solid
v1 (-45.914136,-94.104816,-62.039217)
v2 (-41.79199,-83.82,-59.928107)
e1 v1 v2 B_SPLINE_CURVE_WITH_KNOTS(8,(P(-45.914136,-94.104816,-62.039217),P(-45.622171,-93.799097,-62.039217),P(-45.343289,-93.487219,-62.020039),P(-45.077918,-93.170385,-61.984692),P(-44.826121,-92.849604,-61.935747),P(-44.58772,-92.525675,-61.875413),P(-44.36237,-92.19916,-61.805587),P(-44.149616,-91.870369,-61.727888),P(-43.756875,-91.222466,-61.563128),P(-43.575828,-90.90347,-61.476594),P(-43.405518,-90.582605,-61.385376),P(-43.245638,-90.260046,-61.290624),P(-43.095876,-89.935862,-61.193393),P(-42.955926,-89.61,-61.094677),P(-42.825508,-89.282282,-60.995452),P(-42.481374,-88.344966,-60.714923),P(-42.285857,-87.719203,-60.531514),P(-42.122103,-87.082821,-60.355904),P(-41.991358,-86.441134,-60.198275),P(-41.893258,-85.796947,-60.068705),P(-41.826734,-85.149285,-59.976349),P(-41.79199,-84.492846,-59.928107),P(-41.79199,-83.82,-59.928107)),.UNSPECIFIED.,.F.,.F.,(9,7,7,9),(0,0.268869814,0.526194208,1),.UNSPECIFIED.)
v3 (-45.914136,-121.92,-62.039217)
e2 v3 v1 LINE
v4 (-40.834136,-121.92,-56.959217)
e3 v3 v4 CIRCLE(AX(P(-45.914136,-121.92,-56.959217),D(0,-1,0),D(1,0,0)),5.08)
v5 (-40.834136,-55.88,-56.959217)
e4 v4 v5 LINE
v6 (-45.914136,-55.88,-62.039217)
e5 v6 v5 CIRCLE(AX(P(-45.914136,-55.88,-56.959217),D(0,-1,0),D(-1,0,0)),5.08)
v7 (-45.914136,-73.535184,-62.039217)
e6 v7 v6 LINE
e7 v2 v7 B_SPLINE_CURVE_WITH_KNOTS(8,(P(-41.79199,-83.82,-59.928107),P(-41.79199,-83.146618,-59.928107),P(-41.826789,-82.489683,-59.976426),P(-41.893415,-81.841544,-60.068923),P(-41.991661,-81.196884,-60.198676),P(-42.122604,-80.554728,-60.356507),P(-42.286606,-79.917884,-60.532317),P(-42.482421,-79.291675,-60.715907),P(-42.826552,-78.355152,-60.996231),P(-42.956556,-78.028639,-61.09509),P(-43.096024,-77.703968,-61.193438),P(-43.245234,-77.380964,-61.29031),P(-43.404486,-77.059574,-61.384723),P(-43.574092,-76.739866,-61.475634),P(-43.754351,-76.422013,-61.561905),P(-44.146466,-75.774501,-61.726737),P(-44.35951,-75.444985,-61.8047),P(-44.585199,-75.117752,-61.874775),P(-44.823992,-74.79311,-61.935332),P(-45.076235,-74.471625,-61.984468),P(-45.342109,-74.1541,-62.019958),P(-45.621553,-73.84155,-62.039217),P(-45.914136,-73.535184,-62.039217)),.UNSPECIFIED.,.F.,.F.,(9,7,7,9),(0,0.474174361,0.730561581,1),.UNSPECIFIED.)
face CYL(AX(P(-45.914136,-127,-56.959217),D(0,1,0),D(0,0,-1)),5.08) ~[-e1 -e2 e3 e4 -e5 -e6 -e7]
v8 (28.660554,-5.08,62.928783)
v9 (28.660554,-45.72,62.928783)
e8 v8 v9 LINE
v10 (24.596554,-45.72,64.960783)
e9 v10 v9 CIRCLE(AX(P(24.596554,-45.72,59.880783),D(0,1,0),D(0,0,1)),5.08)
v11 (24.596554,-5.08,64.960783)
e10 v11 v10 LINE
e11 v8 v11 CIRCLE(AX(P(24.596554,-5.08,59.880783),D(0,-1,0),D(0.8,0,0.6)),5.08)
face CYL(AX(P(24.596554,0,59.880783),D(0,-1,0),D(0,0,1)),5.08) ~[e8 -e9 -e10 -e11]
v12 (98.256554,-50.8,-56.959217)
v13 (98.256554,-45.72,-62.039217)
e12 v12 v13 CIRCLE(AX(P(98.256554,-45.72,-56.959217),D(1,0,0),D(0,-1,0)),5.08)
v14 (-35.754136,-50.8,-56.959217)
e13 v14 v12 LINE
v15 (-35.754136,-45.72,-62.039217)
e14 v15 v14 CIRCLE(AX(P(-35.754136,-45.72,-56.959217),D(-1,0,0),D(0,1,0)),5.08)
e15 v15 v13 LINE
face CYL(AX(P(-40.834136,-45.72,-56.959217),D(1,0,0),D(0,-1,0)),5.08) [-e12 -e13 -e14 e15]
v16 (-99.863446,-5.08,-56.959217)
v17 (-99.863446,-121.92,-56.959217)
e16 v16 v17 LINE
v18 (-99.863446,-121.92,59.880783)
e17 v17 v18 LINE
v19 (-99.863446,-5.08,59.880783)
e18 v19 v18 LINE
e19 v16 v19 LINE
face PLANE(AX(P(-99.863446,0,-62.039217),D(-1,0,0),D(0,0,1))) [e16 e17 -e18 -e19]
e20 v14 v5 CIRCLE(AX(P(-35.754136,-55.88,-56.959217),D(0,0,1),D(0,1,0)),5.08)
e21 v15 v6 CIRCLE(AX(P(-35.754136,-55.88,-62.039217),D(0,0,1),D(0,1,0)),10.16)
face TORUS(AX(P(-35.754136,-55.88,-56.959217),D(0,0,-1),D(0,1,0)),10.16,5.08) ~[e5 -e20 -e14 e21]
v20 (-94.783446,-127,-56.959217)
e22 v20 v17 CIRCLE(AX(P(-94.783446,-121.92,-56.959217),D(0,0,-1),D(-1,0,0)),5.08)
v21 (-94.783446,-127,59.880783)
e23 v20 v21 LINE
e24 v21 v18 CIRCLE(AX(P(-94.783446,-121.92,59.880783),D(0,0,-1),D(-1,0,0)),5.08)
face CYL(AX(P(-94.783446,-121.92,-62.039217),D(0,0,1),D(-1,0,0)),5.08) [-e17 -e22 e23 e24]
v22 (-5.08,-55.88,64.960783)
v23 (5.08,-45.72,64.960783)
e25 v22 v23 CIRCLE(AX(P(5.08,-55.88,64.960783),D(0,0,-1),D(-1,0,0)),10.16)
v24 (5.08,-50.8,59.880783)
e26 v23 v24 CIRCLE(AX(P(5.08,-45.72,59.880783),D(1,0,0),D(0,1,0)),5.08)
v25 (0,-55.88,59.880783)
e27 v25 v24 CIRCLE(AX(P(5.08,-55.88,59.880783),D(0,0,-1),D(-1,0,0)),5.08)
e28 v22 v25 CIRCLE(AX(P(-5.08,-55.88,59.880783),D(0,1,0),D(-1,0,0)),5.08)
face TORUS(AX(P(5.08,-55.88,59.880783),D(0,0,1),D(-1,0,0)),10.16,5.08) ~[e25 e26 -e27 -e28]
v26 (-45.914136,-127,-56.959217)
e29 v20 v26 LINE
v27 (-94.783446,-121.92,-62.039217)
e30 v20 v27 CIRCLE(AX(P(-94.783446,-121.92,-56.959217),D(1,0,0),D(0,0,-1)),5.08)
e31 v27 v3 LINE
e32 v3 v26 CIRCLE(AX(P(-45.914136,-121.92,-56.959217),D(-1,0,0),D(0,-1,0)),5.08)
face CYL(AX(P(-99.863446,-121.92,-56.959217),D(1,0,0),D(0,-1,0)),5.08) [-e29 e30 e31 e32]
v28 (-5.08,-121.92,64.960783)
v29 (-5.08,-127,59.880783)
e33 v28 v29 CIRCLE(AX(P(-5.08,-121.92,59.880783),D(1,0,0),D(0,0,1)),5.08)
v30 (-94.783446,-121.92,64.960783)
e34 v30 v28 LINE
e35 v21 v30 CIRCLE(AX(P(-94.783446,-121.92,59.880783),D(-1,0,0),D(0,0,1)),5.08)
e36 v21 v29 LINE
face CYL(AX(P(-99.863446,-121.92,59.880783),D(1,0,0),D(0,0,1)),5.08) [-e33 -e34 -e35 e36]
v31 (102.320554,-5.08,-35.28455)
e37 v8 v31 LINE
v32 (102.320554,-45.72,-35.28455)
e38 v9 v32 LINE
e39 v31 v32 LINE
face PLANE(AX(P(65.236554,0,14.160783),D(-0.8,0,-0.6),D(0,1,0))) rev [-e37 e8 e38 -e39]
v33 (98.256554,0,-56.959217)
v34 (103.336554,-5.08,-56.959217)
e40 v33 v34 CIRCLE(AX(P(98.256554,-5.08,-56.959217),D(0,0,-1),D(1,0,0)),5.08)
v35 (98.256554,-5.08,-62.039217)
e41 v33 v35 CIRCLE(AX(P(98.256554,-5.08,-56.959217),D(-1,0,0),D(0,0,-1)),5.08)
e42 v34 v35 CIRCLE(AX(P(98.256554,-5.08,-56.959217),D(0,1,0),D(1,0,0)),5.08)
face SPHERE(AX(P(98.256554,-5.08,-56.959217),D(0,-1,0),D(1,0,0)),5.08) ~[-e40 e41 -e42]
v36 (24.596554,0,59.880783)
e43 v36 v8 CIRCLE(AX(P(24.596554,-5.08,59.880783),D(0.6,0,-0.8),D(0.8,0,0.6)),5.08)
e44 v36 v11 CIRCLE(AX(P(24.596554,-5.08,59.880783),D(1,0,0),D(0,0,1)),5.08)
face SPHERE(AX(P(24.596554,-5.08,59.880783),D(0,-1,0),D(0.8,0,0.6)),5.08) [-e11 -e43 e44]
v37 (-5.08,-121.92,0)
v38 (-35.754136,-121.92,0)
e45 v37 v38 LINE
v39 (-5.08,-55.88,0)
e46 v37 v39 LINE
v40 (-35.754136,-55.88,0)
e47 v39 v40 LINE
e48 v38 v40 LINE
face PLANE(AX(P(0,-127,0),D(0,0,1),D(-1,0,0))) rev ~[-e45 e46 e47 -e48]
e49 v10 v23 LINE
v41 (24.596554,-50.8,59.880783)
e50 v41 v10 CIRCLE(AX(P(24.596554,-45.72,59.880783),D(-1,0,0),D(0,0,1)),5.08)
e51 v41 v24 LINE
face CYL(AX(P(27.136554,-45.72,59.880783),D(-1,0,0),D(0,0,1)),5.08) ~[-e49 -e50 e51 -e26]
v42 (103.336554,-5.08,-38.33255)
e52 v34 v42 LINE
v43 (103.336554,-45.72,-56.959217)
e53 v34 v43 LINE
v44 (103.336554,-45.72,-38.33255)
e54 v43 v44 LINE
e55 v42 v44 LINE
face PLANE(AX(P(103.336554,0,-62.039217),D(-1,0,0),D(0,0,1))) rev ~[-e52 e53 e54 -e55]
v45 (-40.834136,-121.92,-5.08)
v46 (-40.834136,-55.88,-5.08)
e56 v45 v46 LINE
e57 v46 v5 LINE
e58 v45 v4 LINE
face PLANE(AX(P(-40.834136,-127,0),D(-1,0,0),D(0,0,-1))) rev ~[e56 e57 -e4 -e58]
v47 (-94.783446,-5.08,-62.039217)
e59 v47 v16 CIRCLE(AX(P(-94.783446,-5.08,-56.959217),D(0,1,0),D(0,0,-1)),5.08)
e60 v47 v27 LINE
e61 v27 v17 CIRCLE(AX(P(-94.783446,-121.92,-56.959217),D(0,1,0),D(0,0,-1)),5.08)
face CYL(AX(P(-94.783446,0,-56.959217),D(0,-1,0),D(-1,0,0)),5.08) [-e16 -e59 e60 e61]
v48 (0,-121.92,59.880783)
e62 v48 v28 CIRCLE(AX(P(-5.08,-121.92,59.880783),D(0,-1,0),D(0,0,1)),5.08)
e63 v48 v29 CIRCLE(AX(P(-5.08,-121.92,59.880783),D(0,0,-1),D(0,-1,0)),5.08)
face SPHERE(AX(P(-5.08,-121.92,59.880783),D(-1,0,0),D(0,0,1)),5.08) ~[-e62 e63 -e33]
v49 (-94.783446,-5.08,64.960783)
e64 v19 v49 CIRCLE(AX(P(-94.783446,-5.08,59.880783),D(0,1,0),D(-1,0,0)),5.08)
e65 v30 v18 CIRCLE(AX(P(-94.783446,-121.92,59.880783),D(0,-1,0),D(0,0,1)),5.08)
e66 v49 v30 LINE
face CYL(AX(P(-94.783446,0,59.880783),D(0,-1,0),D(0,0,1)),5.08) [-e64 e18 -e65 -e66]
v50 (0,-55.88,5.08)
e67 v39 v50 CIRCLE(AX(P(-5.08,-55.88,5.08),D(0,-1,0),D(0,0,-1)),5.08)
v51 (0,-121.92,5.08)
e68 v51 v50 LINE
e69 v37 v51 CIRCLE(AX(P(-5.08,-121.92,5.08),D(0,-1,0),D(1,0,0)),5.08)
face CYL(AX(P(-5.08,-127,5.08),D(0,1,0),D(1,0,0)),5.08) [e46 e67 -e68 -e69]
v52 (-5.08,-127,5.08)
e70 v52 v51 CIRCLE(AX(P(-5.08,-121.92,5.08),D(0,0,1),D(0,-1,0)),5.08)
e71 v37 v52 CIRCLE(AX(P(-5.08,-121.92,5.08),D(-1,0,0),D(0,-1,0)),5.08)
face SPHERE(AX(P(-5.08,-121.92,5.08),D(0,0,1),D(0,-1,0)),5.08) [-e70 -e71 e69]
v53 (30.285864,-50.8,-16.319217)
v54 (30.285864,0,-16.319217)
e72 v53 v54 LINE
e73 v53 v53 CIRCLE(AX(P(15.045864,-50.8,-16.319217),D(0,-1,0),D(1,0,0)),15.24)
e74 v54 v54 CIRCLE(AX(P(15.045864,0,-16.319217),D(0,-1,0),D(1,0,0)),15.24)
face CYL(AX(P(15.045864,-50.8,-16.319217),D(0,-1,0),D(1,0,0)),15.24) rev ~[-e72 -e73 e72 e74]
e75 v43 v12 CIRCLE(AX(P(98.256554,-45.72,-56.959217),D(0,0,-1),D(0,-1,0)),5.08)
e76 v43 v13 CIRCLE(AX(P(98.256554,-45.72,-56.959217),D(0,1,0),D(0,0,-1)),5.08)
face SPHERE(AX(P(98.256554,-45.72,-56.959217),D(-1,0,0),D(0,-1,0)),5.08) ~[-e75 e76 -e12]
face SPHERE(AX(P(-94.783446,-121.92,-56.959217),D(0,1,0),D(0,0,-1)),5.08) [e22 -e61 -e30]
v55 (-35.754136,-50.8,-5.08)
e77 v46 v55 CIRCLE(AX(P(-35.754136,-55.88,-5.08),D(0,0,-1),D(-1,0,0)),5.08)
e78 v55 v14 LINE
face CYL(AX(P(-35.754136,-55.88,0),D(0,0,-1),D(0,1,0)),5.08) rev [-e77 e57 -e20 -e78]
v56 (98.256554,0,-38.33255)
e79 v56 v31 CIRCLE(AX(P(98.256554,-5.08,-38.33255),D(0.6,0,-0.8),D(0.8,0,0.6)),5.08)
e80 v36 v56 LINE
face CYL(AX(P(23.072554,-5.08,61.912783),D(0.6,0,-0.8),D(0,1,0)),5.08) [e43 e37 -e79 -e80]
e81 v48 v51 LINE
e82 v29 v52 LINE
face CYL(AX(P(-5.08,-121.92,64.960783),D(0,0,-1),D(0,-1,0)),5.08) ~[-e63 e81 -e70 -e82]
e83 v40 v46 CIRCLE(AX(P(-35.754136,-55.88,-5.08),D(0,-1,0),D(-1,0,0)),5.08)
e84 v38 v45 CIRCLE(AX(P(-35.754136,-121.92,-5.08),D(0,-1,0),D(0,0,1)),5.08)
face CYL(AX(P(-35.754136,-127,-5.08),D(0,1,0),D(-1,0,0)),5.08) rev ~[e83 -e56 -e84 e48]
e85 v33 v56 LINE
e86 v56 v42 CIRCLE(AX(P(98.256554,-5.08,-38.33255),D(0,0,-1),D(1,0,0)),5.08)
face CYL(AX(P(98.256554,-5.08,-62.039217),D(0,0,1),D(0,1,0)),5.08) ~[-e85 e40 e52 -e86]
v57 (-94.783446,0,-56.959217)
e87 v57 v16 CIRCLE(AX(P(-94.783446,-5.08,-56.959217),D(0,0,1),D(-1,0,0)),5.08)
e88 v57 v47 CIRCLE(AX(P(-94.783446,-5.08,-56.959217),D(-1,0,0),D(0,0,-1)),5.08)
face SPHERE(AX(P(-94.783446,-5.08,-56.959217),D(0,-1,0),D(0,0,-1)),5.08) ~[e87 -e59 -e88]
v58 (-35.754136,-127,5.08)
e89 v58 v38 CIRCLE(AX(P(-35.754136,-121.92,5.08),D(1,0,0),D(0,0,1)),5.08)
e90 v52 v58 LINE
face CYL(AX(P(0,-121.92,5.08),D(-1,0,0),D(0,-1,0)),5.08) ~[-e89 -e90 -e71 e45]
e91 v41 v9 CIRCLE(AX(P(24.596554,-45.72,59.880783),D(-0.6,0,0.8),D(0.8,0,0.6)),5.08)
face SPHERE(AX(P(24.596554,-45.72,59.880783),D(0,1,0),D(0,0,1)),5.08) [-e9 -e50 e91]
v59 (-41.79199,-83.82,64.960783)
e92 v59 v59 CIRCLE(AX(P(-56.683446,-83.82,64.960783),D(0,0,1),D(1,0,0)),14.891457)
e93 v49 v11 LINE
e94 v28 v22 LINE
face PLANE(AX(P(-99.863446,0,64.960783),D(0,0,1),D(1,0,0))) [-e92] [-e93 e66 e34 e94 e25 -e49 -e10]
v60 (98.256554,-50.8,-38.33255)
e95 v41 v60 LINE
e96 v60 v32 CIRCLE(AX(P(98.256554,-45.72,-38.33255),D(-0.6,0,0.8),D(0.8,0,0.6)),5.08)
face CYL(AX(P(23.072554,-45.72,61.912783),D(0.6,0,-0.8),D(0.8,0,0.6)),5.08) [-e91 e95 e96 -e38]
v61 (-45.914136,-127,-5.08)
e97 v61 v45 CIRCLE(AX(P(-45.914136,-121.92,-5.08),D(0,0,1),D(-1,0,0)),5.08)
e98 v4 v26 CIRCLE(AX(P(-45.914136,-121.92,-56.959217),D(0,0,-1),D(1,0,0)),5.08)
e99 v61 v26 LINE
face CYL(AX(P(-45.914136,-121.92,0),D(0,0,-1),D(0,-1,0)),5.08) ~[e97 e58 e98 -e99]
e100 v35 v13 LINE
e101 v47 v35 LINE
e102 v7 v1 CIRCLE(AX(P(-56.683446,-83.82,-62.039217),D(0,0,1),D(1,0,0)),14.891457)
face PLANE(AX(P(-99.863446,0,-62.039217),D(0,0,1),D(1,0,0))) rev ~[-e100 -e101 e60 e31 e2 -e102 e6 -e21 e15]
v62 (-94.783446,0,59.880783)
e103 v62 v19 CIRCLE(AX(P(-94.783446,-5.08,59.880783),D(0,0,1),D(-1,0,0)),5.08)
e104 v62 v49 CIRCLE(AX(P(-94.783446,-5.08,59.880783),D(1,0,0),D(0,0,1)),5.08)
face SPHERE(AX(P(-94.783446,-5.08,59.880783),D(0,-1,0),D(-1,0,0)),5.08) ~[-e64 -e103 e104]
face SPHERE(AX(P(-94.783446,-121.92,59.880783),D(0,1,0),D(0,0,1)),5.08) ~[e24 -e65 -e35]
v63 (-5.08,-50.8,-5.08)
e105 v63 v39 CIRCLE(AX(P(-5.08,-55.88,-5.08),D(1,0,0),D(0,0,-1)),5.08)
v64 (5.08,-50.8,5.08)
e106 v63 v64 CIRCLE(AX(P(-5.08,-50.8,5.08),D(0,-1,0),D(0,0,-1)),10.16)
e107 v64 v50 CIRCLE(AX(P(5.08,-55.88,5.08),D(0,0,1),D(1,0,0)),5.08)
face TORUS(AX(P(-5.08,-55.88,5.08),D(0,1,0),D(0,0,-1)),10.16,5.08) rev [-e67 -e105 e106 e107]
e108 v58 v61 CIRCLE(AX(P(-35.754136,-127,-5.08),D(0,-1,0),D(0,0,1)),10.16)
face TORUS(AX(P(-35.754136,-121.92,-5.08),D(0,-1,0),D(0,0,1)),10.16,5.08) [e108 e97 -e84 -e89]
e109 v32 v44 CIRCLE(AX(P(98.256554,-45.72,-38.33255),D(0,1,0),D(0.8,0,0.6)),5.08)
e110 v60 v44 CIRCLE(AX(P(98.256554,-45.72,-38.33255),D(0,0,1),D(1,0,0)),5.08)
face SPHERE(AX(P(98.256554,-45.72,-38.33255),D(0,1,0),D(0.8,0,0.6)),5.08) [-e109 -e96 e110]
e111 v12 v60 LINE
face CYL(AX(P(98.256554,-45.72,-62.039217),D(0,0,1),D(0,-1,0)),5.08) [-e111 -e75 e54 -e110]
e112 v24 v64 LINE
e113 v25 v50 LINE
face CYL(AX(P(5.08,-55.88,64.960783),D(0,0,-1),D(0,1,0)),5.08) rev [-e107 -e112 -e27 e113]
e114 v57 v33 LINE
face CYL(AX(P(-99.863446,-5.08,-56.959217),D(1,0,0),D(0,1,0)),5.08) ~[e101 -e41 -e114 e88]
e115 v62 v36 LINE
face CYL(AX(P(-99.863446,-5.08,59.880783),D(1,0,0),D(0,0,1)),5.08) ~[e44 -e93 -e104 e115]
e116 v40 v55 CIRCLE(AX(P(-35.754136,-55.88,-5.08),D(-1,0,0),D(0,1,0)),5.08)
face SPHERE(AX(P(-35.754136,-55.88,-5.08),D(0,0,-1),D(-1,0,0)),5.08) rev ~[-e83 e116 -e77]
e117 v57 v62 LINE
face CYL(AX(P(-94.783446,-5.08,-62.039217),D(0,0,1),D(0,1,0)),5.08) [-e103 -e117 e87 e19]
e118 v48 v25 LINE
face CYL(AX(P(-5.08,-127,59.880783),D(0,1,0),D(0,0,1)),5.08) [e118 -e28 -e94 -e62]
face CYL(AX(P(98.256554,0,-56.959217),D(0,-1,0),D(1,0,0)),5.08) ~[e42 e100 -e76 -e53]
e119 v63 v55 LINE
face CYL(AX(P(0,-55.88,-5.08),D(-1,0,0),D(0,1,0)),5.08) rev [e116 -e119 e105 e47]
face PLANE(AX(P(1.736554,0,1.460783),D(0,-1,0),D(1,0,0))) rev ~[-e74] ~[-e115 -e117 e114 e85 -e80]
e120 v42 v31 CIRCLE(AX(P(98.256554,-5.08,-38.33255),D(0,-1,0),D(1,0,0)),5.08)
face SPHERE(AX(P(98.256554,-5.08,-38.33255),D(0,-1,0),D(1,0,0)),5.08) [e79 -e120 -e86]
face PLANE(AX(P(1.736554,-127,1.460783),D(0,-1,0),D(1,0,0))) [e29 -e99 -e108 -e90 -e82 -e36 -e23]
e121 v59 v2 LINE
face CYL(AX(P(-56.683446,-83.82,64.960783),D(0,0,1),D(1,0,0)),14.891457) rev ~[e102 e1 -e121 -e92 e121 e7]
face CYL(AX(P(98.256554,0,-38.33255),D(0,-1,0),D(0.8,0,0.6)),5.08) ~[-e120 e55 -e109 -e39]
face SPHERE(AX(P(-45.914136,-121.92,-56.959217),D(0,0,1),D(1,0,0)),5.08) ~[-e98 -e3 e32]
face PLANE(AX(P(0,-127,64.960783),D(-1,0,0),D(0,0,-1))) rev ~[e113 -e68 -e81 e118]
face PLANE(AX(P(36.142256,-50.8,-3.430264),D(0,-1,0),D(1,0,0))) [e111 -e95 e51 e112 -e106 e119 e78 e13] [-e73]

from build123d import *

# Parameters (mm, degrees)
F0_W     = 203.2
F0_H     = 127
F1_DEPTH = 127
F3_DEPTH = 76.2
F4_SIZE2 = 101.6
F4_SIZE  = 76.2
F5_R     = 5.08
F6_R     = 15.24
F7_DEPTH = 50.8
F8_R     = 14.8914565461
F9_DEPTH = 127


with BuildPart() as f1:
    # F0 (on Front) → F1 (new body)
    with BuildSketch(Plane.XZ):
        with Locations((1.736553802, 1.4607831836)):
            Rectangle(F0_W, F0_H)
    extrude(amount=F1_DEPTH)

    # F2 (on face) → F3 (cut)
    with BuildSketch(Plane.XZ.offset(127)):
        Polygon((0, 64.9607831836), (0, 0), (-40.8341363072, 0), (-40.8341363072, -62.0392168164), (103.336553802, -62.0392168164), (103.336553802, 64.9607831836), align=None)
    extrude(amount=-F3_DEPTH, mode=Mode.SUBTRACT)

    # F4
    f4_edges = [f1.edges().sort_by_distance(p)[0] for p in [
        (103.336554, -25.4, 64.960783),
    ]]
    f4_side = f1.faces().sort_by_distance((-20.189124, -52.346525, 64.960783))[0]
    chamfer(f4_edges, length=F4_SIZE, length2=F4_SIZE2, reference=f4_side)

    # F5
    f5_edges = [f1.edges().sort_by_distance(p)[0] for p in [
        (-99.863446, -63.5, 64.960783),
        (-49.931723, -127, 64.960783),
        (0, -88.9, 64.960783),
        (27.136554, -25.4, 64.960783),
        (13.568277, -50.8, 64.960783),
        (65.236554, -50.8, 14.160783),
        (0, -50.8, 32.480392),
        (0, -127, 32.480392),
        (31.251209, -50.8, -62.039217),
        (103.336554, -50.8, -49.339217),
        (103.336554, -25.4, -36.639217),
        (103.336554, -25.4, -62.039217),
        (103.336554, 0, -49.339217),
        (65.236554, 0, 14.160783),
        (-20.417068, -127, 0),
        (-40.834136, -127, -31.019608),
        (-40.834136, -88.9, -62.039217),
        (-40.834136, -50.8, -31.019608),
        (0, -88.9, 0),
        (-40.834136, -88.9, 0),
        (-99.863446, -63.5, -62.039217),
        (-70.348791, -127, -62.039217),
        (1.736554, 0, -62.039217),
        (-99.863446, -127, 1.460783),
        (-99.863446, 0, 1.460783),
        (-36.363446, 0, 64.960783),
        (-20.417068, -50.8, 0),
    ]]
    fillet(f5_edges, radius=F5_R)

    # F6 (on face) → F7 (cut, through all)
    with BuildSketch(Plane.XZ.offset(50.8)):
        with Locations((15.0458636928, -16.3192168164)):
            Circle(F6_R)
    extrude(amount=-F7_DEPTH, mode=Mode.SUBTRACT)

    # F8 (on face) → F9 (cut, through all)
    with BuildSketch(Plane.XY.offset(64.9607831836)):
        with Locations((-56.683446198, -83.82)):
            Circle(F8_R)
    extrude(amount=-F9_DEPTH, mode=Mode.SUBTRACT)


solid = f1.part
